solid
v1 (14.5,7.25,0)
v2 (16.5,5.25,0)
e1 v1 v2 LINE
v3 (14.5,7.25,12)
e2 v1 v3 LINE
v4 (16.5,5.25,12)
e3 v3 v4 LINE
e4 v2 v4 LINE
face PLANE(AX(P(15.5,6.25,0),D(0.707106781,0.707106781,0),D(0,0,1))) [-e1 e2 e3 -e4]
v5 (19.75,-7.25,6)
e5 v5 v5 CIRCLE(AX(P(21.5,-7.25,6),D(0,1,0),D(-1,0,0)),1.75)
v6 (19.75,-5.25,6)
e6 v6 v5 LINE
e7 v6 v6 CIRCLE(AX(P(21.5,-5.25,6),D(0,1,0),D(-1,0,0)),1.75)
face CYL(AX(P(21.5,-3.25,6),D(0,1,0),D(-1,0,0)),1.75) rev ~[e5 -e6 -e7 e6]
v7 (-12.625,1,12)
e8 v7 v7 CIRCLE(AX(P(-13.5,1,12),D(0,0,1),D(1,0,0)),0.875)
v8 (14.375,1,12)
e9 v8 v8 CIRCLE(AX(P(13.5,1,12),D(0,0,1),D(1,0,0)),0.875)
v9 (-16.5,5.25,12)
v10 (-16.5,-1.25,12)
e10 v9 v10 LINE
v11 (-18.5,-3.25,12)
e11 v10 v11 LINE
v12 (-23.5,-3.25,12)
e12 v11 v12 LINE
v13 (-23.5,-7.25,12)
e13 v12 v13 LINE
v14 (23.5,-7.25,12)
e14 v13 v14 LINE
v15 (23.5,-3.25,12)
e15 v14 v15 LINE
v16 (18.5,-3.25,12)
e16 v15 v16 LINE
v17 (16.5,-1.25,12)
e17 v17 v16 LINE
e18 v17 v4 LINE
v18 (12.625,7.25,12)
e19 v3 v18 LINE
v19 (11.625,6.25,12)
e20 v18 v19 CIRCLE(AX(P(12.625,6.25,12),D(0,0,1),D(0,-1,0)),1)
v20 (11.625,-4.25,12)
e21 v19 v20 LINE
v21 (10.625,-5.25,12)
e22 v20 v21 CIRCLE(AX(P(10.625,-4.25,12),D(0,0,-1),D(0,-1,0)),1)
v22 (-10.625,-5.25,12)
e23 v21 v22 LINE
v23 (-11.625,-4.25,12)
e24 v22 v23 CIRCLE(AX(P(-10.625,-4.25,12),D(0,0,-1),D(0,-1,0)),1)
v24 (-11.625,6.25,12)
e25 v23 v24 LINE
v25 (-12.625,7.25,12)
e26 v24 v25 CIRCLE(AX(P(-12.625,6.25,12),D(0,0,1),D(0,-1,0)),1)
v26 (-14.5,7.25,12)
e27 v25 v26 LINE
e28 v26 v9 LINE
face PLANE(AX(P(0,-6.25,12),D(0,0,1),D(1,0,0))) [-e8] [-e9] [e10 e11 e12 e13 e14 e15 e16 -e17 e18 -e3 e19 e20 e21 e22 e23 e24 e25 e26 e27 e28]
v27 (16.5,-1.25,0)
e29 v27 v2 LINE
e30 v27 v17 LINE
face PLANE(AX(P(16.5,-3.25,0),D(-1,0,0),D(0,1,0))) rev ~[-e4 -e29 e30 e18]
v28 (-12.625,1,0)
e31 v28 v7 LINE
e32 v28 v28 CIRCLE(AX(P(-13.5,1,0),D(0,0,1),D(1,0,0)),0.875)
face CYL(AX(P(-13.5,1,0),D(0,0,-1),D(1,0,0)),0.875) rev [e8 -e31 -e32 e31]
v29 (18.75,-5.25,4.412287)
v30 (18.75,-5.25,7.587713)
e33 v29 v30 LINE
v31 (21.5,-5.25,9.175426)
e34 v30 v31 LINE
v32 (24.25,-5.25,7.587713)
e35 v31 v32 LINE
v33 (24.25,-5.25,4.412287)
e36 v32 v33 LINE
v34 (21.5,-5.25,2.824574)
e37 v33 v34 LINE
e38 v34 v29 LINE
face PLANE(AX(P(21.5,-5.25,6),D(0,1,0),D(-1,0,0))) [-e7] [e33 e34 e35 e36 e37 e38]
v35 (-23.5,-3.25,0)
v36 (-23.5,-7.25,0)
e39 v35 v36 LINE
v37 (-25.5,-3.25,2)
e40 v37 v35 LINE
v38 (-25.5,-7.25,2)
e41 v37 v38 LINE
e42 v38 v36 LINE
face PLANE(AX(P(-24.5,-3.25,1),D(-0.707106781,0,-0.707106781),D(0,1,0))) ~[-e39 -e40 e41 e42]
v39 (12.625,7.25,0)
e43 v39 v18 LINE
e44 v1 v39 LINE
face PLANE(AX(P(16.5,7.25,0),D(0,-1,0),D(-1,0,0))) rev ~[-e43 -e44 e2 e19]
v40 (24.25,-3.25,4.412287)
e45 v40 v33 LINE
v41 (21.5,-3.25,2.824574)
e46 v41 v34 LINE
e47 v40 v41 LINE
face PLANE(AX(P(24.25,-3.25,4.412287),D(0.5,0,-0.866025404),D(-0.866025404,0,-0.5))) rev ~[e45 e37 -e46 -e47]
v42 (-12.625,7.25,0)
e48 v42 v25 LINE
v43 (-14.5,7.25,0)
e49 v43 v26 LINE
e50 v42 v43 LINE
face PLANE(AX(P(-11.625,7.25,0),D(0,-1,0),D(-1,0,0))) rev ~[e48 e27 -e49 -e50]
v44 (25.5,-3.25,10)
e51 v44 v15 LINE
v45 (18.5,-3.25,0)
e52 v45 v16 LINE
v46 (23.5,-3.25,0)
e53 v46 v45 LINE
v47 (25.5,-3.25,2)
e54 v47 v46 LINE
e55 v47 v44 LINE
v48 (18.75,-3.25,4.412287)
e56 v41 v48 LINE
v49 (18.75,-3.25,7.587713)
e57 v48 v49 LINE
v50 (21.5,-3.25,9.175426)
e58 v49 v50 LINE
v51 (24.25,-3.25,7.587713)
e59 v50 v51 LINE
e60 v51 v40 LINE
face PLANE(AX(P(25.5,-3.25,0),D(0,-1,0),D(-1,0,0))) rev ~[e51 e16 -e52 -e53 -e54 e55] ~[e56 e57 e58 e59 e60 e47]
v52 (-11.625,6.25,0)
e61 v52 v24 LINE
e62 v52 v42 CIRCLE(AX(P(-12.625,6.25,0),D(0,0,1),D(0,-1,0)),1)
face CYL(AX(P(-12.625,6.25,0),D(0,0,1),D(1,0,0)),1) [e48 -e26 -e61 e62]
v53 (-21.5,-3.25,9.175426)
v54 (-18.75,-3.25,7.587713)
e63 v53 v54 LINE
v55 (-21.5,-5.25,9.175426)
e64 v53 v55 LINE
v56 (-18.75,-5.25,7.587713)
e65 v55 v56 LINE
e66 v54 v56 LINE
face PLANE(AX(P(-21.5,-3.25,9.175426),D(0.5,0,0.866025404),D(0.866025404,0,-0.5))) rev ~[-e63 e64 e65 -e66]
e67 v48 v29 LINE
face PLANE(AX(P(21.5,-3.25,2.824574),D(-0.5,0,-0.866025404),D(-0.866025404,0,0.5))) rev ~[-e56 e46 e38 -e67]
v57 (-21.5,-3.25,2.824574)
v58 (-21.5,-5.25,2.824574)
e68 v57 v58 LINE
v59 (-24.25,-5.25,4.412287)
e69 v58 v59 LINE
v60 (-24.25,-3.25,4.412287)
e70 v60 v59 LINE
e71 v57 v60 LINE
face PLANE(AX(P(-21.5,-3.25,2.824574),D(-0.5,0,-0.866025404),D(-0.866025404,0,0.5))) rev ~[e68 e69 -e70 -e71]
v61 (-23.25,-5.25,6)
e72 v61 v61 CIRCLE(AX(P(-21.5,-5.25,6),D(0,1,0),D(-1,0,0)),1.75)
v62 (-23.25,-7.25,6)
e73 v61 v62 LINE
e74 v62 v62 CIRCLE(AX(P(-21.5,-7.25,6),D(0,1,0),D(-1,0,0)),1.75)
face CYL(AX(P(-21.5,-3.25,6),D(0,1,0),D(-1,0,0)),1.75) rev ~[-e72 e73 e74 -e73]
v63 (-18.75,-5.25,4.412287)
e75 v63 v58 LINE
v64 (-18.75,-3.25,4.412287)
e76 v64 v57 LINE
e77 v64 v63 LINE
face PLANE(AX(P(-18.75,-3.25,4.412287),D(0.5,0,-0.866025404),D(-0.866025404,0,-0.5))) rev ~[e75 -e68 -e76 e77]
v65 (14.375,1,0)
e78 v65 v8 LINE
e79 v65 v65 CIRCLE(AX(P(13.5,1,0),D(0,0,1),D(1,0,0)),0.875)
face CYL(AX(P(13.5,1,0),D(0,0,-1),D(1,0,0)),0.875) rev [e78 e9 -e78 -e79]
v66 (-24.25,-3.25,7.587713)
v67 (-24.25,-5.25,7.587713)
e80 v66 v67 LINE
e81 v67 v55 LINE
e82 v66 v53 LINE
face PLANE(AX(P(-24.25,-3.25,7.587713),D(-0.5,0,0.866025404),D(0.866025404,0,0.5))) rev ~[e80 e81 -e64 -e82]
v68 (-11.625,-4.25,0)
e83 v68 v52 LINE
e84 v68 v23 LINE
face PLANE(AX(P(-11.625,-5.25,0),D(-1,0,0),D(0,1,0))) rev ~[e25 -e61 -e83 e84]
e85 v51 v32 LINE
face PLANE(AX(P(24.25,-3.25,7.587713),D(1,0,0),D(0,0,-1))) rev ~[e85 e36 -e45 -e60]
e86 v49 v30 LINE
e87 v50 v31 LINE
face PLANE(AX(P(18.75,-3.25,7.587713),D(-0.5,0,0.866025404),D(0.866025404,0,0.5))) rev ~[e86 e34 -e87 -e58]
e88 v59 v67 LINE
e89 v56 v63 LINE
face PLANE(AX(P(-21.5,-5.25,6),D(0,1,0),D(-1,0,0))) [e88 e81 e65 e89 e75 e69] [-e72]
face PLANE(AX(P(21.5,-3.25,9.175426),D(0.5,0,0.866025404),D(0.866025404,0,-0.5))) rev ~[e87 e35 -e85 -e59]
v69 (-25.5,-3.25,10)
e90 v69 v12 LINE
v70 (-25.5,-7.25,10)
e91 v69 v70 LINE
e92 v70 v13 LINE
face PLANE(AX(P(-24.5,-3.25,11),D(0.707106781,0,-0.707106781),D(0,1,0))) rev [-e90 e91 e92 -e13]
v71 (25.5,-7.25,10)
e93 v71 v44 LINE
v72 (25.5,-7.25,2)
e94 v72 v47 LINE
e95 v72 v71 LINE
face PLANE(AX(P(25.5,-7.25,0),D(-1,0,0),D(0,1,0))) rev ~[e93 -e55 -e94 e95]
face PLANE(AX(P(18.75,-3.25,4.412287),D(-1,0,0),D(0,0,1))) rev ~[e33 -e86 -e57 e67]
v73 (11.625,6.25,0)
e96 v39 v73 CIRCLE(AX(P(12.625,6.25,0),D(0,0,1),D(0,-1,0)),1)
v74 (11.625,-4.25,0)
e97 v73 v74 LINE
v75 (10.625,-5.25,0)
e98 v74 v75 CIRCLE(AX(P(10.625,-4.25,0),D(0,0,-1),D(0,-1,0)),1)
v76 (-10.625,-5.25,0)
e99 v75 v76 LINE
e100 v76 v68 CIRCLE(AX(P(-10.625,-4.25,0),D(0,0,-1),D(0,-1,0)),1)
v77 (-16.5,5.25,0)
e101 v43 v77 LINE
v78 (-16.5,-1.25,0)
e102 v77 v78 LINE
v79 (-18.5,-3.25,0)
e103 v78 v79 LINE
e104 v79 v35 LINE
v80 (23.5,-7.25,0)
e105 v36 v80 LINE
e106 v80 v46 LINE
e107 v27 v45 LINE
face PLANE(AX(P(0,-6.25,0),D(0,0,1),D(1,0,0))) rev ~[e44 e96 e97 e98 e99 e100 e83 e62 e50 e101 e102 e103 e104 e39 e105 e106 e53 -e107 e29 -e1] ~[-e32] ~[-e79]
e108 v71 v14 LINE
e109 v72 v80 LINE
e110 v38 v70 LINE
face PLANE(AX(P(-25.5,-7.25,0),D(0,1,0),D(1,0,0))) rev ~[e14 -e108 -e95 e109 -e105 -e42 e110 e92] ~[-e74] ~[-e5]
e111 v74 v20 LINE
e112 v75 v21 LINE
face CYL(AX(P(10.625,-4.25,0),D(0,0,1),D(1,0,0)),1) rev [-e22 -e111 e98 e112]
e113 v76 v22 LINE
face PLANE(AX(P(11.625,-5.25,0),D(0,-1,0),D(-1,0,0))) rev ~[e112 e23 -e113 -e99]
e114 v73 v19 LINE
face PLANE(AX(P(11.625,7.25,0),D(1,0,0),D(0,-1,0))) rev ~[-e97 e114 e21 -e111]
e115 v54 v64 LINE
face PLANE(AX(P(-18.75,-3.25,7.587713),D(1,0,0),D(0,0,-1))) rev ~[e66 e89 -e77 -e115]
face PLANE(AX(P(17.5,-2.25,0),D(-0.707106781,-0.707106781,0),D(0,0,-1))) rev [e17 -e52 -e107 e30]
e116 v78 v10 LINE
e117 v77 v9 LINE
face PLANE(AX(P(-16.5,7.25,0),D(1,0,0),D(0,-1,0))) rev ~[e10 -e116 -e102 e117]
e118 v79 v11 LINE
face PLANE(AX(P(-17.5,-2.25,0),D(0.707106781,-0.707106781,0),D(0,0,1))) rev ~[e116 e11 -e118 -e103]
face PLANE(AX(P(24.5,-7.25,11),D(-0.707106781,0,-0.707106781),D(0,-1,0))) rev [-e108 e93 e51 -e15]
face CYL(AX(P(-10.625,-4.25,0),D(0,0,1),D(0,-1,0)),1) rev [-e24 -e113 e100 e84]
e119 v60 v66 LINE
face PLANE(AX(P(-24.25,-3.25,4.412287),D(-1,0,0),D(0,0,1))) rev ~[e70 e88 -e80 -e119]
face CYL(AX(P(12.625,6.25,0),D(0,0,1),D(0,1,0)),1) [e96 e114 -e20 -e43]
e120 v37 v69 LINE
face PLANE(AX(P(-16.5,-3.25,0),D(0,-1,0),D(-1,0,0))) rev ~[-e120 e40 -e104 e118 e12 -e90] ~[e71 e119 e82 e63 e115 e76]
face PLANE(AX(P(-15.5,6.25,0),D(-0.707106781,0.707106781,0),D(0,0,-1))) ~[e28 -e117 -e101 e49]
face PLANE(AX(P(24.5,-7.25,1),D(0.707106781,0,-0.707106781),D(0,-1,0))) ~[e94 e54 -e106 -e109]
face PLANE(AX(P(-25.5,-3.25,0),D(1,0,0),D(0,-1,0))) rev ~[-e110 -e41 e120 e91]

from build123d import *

# Parameters (mm, degrees)
F0_R     = 0.875
F1_DEPTH = 12
F2_SIZE  = 2
F3_R     = 1.75
F4_DEPTH = 4
F5_DEPTH = 2
F6_R     = 1


with BuildPart() as f1:
    # F0 (on Top) → F1 (new body)
    with BuildSketch(Plane.XY):
        Polygon((11.625, -5.25), (-11.625, -5.25), (-16.5, -5.25), (-16.5, -7.25), (16.5, -7.25), (16.5, -5.25), align=None)
        Polygon((-16.5, -5.25), (-16.5, -3.25), (-25.5, -3.25), (-25.5, -7.25), (-16.5, -7.25), align=None)
        Polygon((25.5, -3.25), (16.5, -3.25), (16.5, -5.25), (16.5, -7.25), (25.5, -7.25), align=None)
        Polygon((-11.625, 7.25), (-16.5, 7.25), (-16.5, -3.25), (-16.5, -5.25), (-11.625, -5.25), align=None)
        with Locations((-13.5, 1)):
            Circle(F0_R, mode=Mode.SUBTRACT)
        Polygon((16.5, 7.25), (11.625, 7.25), (11.625, -5.25), (16.5, -5.25), (16.5, -3.25), align=None)
        with Locations((13.5, 1)):
            Circle(F0_R, mode=Mode.SUBTRACT)
    extrude(amount=F1_DEPTH)

    # F2
    f2_edges = [f1.edges().sort_by_distance(p)[0] for p in [
        (-16.5, -3.25, 6),
        (16.5, -3.25, 6),
        (25.5, -5.25, 12),
        (25.5, -5.25, 0),
        (-25.5, -5.25, 12),
        (-25.5, -5.25, 0),
        (16.5, 7.25, 6),
        (-16.5, 7.25, 6),
    ]]
    chamfer(f2_edges, length=F2_SIZE)

    # F3 (on face) → F4 (cut, through all)
    with BuildSketch(Plane(origin=(0, -3.25, 0), x_dir=(-1, 0, 0), z_dir=(0, 1, 0))):
        with Locations((21.5, 6)):
            Circle(F3_R)
        with Locations((-21.5, 6)):
            Circle(F3_R)
    extrude(amount=-F4_DEPTH, mode=Mode.SUBTRACT)

    # F3 (on face) → F5 (cut)
    with BuildSketch(Plane(origin=(0, -3.25, 0), x_dir=(-1, 0, 0), z_dir=(0, 1, 0))):
        Polygon((-18.75, 4.4122867597), (-18.75, 7.5877132403), (-21.5, 9.1754264805), (-24.25, 7.5877132403), (-24.25, 4.4122867597), (-21.5, 2.8245735195), align=None)
        with Locations((-21.5, 6)):
            Circle(F3_R, mode=Mode.SUBTRACT)
        Polygon((18.75, 7.5877132403), (18.75, 4.4122867597), (21.5, 2.8245735195), (24.25, 4.4122867597), (24.25, 7.5877132403), (21.5, 9.1754264805), align=None)
        with Locations((21.5, 6)):
            Circle(F3_R, mode=Mode.SUBTRACT)
    extrude(amount=-F5_DEPTH, mode=Mode.SUBTRACT)

    # F6
    f6_edges = [f1.edges().sort_by_distance(p)[0] for p in [
        (11.625, -5.25, 6),
        (-11.625, -5.25, 6),
        (-11.625, 7.25, 6),
        (11.625, 7.25, 6),
    ]]
    fillet(f6_edges, radius=F6_R)


solid = f1.part
